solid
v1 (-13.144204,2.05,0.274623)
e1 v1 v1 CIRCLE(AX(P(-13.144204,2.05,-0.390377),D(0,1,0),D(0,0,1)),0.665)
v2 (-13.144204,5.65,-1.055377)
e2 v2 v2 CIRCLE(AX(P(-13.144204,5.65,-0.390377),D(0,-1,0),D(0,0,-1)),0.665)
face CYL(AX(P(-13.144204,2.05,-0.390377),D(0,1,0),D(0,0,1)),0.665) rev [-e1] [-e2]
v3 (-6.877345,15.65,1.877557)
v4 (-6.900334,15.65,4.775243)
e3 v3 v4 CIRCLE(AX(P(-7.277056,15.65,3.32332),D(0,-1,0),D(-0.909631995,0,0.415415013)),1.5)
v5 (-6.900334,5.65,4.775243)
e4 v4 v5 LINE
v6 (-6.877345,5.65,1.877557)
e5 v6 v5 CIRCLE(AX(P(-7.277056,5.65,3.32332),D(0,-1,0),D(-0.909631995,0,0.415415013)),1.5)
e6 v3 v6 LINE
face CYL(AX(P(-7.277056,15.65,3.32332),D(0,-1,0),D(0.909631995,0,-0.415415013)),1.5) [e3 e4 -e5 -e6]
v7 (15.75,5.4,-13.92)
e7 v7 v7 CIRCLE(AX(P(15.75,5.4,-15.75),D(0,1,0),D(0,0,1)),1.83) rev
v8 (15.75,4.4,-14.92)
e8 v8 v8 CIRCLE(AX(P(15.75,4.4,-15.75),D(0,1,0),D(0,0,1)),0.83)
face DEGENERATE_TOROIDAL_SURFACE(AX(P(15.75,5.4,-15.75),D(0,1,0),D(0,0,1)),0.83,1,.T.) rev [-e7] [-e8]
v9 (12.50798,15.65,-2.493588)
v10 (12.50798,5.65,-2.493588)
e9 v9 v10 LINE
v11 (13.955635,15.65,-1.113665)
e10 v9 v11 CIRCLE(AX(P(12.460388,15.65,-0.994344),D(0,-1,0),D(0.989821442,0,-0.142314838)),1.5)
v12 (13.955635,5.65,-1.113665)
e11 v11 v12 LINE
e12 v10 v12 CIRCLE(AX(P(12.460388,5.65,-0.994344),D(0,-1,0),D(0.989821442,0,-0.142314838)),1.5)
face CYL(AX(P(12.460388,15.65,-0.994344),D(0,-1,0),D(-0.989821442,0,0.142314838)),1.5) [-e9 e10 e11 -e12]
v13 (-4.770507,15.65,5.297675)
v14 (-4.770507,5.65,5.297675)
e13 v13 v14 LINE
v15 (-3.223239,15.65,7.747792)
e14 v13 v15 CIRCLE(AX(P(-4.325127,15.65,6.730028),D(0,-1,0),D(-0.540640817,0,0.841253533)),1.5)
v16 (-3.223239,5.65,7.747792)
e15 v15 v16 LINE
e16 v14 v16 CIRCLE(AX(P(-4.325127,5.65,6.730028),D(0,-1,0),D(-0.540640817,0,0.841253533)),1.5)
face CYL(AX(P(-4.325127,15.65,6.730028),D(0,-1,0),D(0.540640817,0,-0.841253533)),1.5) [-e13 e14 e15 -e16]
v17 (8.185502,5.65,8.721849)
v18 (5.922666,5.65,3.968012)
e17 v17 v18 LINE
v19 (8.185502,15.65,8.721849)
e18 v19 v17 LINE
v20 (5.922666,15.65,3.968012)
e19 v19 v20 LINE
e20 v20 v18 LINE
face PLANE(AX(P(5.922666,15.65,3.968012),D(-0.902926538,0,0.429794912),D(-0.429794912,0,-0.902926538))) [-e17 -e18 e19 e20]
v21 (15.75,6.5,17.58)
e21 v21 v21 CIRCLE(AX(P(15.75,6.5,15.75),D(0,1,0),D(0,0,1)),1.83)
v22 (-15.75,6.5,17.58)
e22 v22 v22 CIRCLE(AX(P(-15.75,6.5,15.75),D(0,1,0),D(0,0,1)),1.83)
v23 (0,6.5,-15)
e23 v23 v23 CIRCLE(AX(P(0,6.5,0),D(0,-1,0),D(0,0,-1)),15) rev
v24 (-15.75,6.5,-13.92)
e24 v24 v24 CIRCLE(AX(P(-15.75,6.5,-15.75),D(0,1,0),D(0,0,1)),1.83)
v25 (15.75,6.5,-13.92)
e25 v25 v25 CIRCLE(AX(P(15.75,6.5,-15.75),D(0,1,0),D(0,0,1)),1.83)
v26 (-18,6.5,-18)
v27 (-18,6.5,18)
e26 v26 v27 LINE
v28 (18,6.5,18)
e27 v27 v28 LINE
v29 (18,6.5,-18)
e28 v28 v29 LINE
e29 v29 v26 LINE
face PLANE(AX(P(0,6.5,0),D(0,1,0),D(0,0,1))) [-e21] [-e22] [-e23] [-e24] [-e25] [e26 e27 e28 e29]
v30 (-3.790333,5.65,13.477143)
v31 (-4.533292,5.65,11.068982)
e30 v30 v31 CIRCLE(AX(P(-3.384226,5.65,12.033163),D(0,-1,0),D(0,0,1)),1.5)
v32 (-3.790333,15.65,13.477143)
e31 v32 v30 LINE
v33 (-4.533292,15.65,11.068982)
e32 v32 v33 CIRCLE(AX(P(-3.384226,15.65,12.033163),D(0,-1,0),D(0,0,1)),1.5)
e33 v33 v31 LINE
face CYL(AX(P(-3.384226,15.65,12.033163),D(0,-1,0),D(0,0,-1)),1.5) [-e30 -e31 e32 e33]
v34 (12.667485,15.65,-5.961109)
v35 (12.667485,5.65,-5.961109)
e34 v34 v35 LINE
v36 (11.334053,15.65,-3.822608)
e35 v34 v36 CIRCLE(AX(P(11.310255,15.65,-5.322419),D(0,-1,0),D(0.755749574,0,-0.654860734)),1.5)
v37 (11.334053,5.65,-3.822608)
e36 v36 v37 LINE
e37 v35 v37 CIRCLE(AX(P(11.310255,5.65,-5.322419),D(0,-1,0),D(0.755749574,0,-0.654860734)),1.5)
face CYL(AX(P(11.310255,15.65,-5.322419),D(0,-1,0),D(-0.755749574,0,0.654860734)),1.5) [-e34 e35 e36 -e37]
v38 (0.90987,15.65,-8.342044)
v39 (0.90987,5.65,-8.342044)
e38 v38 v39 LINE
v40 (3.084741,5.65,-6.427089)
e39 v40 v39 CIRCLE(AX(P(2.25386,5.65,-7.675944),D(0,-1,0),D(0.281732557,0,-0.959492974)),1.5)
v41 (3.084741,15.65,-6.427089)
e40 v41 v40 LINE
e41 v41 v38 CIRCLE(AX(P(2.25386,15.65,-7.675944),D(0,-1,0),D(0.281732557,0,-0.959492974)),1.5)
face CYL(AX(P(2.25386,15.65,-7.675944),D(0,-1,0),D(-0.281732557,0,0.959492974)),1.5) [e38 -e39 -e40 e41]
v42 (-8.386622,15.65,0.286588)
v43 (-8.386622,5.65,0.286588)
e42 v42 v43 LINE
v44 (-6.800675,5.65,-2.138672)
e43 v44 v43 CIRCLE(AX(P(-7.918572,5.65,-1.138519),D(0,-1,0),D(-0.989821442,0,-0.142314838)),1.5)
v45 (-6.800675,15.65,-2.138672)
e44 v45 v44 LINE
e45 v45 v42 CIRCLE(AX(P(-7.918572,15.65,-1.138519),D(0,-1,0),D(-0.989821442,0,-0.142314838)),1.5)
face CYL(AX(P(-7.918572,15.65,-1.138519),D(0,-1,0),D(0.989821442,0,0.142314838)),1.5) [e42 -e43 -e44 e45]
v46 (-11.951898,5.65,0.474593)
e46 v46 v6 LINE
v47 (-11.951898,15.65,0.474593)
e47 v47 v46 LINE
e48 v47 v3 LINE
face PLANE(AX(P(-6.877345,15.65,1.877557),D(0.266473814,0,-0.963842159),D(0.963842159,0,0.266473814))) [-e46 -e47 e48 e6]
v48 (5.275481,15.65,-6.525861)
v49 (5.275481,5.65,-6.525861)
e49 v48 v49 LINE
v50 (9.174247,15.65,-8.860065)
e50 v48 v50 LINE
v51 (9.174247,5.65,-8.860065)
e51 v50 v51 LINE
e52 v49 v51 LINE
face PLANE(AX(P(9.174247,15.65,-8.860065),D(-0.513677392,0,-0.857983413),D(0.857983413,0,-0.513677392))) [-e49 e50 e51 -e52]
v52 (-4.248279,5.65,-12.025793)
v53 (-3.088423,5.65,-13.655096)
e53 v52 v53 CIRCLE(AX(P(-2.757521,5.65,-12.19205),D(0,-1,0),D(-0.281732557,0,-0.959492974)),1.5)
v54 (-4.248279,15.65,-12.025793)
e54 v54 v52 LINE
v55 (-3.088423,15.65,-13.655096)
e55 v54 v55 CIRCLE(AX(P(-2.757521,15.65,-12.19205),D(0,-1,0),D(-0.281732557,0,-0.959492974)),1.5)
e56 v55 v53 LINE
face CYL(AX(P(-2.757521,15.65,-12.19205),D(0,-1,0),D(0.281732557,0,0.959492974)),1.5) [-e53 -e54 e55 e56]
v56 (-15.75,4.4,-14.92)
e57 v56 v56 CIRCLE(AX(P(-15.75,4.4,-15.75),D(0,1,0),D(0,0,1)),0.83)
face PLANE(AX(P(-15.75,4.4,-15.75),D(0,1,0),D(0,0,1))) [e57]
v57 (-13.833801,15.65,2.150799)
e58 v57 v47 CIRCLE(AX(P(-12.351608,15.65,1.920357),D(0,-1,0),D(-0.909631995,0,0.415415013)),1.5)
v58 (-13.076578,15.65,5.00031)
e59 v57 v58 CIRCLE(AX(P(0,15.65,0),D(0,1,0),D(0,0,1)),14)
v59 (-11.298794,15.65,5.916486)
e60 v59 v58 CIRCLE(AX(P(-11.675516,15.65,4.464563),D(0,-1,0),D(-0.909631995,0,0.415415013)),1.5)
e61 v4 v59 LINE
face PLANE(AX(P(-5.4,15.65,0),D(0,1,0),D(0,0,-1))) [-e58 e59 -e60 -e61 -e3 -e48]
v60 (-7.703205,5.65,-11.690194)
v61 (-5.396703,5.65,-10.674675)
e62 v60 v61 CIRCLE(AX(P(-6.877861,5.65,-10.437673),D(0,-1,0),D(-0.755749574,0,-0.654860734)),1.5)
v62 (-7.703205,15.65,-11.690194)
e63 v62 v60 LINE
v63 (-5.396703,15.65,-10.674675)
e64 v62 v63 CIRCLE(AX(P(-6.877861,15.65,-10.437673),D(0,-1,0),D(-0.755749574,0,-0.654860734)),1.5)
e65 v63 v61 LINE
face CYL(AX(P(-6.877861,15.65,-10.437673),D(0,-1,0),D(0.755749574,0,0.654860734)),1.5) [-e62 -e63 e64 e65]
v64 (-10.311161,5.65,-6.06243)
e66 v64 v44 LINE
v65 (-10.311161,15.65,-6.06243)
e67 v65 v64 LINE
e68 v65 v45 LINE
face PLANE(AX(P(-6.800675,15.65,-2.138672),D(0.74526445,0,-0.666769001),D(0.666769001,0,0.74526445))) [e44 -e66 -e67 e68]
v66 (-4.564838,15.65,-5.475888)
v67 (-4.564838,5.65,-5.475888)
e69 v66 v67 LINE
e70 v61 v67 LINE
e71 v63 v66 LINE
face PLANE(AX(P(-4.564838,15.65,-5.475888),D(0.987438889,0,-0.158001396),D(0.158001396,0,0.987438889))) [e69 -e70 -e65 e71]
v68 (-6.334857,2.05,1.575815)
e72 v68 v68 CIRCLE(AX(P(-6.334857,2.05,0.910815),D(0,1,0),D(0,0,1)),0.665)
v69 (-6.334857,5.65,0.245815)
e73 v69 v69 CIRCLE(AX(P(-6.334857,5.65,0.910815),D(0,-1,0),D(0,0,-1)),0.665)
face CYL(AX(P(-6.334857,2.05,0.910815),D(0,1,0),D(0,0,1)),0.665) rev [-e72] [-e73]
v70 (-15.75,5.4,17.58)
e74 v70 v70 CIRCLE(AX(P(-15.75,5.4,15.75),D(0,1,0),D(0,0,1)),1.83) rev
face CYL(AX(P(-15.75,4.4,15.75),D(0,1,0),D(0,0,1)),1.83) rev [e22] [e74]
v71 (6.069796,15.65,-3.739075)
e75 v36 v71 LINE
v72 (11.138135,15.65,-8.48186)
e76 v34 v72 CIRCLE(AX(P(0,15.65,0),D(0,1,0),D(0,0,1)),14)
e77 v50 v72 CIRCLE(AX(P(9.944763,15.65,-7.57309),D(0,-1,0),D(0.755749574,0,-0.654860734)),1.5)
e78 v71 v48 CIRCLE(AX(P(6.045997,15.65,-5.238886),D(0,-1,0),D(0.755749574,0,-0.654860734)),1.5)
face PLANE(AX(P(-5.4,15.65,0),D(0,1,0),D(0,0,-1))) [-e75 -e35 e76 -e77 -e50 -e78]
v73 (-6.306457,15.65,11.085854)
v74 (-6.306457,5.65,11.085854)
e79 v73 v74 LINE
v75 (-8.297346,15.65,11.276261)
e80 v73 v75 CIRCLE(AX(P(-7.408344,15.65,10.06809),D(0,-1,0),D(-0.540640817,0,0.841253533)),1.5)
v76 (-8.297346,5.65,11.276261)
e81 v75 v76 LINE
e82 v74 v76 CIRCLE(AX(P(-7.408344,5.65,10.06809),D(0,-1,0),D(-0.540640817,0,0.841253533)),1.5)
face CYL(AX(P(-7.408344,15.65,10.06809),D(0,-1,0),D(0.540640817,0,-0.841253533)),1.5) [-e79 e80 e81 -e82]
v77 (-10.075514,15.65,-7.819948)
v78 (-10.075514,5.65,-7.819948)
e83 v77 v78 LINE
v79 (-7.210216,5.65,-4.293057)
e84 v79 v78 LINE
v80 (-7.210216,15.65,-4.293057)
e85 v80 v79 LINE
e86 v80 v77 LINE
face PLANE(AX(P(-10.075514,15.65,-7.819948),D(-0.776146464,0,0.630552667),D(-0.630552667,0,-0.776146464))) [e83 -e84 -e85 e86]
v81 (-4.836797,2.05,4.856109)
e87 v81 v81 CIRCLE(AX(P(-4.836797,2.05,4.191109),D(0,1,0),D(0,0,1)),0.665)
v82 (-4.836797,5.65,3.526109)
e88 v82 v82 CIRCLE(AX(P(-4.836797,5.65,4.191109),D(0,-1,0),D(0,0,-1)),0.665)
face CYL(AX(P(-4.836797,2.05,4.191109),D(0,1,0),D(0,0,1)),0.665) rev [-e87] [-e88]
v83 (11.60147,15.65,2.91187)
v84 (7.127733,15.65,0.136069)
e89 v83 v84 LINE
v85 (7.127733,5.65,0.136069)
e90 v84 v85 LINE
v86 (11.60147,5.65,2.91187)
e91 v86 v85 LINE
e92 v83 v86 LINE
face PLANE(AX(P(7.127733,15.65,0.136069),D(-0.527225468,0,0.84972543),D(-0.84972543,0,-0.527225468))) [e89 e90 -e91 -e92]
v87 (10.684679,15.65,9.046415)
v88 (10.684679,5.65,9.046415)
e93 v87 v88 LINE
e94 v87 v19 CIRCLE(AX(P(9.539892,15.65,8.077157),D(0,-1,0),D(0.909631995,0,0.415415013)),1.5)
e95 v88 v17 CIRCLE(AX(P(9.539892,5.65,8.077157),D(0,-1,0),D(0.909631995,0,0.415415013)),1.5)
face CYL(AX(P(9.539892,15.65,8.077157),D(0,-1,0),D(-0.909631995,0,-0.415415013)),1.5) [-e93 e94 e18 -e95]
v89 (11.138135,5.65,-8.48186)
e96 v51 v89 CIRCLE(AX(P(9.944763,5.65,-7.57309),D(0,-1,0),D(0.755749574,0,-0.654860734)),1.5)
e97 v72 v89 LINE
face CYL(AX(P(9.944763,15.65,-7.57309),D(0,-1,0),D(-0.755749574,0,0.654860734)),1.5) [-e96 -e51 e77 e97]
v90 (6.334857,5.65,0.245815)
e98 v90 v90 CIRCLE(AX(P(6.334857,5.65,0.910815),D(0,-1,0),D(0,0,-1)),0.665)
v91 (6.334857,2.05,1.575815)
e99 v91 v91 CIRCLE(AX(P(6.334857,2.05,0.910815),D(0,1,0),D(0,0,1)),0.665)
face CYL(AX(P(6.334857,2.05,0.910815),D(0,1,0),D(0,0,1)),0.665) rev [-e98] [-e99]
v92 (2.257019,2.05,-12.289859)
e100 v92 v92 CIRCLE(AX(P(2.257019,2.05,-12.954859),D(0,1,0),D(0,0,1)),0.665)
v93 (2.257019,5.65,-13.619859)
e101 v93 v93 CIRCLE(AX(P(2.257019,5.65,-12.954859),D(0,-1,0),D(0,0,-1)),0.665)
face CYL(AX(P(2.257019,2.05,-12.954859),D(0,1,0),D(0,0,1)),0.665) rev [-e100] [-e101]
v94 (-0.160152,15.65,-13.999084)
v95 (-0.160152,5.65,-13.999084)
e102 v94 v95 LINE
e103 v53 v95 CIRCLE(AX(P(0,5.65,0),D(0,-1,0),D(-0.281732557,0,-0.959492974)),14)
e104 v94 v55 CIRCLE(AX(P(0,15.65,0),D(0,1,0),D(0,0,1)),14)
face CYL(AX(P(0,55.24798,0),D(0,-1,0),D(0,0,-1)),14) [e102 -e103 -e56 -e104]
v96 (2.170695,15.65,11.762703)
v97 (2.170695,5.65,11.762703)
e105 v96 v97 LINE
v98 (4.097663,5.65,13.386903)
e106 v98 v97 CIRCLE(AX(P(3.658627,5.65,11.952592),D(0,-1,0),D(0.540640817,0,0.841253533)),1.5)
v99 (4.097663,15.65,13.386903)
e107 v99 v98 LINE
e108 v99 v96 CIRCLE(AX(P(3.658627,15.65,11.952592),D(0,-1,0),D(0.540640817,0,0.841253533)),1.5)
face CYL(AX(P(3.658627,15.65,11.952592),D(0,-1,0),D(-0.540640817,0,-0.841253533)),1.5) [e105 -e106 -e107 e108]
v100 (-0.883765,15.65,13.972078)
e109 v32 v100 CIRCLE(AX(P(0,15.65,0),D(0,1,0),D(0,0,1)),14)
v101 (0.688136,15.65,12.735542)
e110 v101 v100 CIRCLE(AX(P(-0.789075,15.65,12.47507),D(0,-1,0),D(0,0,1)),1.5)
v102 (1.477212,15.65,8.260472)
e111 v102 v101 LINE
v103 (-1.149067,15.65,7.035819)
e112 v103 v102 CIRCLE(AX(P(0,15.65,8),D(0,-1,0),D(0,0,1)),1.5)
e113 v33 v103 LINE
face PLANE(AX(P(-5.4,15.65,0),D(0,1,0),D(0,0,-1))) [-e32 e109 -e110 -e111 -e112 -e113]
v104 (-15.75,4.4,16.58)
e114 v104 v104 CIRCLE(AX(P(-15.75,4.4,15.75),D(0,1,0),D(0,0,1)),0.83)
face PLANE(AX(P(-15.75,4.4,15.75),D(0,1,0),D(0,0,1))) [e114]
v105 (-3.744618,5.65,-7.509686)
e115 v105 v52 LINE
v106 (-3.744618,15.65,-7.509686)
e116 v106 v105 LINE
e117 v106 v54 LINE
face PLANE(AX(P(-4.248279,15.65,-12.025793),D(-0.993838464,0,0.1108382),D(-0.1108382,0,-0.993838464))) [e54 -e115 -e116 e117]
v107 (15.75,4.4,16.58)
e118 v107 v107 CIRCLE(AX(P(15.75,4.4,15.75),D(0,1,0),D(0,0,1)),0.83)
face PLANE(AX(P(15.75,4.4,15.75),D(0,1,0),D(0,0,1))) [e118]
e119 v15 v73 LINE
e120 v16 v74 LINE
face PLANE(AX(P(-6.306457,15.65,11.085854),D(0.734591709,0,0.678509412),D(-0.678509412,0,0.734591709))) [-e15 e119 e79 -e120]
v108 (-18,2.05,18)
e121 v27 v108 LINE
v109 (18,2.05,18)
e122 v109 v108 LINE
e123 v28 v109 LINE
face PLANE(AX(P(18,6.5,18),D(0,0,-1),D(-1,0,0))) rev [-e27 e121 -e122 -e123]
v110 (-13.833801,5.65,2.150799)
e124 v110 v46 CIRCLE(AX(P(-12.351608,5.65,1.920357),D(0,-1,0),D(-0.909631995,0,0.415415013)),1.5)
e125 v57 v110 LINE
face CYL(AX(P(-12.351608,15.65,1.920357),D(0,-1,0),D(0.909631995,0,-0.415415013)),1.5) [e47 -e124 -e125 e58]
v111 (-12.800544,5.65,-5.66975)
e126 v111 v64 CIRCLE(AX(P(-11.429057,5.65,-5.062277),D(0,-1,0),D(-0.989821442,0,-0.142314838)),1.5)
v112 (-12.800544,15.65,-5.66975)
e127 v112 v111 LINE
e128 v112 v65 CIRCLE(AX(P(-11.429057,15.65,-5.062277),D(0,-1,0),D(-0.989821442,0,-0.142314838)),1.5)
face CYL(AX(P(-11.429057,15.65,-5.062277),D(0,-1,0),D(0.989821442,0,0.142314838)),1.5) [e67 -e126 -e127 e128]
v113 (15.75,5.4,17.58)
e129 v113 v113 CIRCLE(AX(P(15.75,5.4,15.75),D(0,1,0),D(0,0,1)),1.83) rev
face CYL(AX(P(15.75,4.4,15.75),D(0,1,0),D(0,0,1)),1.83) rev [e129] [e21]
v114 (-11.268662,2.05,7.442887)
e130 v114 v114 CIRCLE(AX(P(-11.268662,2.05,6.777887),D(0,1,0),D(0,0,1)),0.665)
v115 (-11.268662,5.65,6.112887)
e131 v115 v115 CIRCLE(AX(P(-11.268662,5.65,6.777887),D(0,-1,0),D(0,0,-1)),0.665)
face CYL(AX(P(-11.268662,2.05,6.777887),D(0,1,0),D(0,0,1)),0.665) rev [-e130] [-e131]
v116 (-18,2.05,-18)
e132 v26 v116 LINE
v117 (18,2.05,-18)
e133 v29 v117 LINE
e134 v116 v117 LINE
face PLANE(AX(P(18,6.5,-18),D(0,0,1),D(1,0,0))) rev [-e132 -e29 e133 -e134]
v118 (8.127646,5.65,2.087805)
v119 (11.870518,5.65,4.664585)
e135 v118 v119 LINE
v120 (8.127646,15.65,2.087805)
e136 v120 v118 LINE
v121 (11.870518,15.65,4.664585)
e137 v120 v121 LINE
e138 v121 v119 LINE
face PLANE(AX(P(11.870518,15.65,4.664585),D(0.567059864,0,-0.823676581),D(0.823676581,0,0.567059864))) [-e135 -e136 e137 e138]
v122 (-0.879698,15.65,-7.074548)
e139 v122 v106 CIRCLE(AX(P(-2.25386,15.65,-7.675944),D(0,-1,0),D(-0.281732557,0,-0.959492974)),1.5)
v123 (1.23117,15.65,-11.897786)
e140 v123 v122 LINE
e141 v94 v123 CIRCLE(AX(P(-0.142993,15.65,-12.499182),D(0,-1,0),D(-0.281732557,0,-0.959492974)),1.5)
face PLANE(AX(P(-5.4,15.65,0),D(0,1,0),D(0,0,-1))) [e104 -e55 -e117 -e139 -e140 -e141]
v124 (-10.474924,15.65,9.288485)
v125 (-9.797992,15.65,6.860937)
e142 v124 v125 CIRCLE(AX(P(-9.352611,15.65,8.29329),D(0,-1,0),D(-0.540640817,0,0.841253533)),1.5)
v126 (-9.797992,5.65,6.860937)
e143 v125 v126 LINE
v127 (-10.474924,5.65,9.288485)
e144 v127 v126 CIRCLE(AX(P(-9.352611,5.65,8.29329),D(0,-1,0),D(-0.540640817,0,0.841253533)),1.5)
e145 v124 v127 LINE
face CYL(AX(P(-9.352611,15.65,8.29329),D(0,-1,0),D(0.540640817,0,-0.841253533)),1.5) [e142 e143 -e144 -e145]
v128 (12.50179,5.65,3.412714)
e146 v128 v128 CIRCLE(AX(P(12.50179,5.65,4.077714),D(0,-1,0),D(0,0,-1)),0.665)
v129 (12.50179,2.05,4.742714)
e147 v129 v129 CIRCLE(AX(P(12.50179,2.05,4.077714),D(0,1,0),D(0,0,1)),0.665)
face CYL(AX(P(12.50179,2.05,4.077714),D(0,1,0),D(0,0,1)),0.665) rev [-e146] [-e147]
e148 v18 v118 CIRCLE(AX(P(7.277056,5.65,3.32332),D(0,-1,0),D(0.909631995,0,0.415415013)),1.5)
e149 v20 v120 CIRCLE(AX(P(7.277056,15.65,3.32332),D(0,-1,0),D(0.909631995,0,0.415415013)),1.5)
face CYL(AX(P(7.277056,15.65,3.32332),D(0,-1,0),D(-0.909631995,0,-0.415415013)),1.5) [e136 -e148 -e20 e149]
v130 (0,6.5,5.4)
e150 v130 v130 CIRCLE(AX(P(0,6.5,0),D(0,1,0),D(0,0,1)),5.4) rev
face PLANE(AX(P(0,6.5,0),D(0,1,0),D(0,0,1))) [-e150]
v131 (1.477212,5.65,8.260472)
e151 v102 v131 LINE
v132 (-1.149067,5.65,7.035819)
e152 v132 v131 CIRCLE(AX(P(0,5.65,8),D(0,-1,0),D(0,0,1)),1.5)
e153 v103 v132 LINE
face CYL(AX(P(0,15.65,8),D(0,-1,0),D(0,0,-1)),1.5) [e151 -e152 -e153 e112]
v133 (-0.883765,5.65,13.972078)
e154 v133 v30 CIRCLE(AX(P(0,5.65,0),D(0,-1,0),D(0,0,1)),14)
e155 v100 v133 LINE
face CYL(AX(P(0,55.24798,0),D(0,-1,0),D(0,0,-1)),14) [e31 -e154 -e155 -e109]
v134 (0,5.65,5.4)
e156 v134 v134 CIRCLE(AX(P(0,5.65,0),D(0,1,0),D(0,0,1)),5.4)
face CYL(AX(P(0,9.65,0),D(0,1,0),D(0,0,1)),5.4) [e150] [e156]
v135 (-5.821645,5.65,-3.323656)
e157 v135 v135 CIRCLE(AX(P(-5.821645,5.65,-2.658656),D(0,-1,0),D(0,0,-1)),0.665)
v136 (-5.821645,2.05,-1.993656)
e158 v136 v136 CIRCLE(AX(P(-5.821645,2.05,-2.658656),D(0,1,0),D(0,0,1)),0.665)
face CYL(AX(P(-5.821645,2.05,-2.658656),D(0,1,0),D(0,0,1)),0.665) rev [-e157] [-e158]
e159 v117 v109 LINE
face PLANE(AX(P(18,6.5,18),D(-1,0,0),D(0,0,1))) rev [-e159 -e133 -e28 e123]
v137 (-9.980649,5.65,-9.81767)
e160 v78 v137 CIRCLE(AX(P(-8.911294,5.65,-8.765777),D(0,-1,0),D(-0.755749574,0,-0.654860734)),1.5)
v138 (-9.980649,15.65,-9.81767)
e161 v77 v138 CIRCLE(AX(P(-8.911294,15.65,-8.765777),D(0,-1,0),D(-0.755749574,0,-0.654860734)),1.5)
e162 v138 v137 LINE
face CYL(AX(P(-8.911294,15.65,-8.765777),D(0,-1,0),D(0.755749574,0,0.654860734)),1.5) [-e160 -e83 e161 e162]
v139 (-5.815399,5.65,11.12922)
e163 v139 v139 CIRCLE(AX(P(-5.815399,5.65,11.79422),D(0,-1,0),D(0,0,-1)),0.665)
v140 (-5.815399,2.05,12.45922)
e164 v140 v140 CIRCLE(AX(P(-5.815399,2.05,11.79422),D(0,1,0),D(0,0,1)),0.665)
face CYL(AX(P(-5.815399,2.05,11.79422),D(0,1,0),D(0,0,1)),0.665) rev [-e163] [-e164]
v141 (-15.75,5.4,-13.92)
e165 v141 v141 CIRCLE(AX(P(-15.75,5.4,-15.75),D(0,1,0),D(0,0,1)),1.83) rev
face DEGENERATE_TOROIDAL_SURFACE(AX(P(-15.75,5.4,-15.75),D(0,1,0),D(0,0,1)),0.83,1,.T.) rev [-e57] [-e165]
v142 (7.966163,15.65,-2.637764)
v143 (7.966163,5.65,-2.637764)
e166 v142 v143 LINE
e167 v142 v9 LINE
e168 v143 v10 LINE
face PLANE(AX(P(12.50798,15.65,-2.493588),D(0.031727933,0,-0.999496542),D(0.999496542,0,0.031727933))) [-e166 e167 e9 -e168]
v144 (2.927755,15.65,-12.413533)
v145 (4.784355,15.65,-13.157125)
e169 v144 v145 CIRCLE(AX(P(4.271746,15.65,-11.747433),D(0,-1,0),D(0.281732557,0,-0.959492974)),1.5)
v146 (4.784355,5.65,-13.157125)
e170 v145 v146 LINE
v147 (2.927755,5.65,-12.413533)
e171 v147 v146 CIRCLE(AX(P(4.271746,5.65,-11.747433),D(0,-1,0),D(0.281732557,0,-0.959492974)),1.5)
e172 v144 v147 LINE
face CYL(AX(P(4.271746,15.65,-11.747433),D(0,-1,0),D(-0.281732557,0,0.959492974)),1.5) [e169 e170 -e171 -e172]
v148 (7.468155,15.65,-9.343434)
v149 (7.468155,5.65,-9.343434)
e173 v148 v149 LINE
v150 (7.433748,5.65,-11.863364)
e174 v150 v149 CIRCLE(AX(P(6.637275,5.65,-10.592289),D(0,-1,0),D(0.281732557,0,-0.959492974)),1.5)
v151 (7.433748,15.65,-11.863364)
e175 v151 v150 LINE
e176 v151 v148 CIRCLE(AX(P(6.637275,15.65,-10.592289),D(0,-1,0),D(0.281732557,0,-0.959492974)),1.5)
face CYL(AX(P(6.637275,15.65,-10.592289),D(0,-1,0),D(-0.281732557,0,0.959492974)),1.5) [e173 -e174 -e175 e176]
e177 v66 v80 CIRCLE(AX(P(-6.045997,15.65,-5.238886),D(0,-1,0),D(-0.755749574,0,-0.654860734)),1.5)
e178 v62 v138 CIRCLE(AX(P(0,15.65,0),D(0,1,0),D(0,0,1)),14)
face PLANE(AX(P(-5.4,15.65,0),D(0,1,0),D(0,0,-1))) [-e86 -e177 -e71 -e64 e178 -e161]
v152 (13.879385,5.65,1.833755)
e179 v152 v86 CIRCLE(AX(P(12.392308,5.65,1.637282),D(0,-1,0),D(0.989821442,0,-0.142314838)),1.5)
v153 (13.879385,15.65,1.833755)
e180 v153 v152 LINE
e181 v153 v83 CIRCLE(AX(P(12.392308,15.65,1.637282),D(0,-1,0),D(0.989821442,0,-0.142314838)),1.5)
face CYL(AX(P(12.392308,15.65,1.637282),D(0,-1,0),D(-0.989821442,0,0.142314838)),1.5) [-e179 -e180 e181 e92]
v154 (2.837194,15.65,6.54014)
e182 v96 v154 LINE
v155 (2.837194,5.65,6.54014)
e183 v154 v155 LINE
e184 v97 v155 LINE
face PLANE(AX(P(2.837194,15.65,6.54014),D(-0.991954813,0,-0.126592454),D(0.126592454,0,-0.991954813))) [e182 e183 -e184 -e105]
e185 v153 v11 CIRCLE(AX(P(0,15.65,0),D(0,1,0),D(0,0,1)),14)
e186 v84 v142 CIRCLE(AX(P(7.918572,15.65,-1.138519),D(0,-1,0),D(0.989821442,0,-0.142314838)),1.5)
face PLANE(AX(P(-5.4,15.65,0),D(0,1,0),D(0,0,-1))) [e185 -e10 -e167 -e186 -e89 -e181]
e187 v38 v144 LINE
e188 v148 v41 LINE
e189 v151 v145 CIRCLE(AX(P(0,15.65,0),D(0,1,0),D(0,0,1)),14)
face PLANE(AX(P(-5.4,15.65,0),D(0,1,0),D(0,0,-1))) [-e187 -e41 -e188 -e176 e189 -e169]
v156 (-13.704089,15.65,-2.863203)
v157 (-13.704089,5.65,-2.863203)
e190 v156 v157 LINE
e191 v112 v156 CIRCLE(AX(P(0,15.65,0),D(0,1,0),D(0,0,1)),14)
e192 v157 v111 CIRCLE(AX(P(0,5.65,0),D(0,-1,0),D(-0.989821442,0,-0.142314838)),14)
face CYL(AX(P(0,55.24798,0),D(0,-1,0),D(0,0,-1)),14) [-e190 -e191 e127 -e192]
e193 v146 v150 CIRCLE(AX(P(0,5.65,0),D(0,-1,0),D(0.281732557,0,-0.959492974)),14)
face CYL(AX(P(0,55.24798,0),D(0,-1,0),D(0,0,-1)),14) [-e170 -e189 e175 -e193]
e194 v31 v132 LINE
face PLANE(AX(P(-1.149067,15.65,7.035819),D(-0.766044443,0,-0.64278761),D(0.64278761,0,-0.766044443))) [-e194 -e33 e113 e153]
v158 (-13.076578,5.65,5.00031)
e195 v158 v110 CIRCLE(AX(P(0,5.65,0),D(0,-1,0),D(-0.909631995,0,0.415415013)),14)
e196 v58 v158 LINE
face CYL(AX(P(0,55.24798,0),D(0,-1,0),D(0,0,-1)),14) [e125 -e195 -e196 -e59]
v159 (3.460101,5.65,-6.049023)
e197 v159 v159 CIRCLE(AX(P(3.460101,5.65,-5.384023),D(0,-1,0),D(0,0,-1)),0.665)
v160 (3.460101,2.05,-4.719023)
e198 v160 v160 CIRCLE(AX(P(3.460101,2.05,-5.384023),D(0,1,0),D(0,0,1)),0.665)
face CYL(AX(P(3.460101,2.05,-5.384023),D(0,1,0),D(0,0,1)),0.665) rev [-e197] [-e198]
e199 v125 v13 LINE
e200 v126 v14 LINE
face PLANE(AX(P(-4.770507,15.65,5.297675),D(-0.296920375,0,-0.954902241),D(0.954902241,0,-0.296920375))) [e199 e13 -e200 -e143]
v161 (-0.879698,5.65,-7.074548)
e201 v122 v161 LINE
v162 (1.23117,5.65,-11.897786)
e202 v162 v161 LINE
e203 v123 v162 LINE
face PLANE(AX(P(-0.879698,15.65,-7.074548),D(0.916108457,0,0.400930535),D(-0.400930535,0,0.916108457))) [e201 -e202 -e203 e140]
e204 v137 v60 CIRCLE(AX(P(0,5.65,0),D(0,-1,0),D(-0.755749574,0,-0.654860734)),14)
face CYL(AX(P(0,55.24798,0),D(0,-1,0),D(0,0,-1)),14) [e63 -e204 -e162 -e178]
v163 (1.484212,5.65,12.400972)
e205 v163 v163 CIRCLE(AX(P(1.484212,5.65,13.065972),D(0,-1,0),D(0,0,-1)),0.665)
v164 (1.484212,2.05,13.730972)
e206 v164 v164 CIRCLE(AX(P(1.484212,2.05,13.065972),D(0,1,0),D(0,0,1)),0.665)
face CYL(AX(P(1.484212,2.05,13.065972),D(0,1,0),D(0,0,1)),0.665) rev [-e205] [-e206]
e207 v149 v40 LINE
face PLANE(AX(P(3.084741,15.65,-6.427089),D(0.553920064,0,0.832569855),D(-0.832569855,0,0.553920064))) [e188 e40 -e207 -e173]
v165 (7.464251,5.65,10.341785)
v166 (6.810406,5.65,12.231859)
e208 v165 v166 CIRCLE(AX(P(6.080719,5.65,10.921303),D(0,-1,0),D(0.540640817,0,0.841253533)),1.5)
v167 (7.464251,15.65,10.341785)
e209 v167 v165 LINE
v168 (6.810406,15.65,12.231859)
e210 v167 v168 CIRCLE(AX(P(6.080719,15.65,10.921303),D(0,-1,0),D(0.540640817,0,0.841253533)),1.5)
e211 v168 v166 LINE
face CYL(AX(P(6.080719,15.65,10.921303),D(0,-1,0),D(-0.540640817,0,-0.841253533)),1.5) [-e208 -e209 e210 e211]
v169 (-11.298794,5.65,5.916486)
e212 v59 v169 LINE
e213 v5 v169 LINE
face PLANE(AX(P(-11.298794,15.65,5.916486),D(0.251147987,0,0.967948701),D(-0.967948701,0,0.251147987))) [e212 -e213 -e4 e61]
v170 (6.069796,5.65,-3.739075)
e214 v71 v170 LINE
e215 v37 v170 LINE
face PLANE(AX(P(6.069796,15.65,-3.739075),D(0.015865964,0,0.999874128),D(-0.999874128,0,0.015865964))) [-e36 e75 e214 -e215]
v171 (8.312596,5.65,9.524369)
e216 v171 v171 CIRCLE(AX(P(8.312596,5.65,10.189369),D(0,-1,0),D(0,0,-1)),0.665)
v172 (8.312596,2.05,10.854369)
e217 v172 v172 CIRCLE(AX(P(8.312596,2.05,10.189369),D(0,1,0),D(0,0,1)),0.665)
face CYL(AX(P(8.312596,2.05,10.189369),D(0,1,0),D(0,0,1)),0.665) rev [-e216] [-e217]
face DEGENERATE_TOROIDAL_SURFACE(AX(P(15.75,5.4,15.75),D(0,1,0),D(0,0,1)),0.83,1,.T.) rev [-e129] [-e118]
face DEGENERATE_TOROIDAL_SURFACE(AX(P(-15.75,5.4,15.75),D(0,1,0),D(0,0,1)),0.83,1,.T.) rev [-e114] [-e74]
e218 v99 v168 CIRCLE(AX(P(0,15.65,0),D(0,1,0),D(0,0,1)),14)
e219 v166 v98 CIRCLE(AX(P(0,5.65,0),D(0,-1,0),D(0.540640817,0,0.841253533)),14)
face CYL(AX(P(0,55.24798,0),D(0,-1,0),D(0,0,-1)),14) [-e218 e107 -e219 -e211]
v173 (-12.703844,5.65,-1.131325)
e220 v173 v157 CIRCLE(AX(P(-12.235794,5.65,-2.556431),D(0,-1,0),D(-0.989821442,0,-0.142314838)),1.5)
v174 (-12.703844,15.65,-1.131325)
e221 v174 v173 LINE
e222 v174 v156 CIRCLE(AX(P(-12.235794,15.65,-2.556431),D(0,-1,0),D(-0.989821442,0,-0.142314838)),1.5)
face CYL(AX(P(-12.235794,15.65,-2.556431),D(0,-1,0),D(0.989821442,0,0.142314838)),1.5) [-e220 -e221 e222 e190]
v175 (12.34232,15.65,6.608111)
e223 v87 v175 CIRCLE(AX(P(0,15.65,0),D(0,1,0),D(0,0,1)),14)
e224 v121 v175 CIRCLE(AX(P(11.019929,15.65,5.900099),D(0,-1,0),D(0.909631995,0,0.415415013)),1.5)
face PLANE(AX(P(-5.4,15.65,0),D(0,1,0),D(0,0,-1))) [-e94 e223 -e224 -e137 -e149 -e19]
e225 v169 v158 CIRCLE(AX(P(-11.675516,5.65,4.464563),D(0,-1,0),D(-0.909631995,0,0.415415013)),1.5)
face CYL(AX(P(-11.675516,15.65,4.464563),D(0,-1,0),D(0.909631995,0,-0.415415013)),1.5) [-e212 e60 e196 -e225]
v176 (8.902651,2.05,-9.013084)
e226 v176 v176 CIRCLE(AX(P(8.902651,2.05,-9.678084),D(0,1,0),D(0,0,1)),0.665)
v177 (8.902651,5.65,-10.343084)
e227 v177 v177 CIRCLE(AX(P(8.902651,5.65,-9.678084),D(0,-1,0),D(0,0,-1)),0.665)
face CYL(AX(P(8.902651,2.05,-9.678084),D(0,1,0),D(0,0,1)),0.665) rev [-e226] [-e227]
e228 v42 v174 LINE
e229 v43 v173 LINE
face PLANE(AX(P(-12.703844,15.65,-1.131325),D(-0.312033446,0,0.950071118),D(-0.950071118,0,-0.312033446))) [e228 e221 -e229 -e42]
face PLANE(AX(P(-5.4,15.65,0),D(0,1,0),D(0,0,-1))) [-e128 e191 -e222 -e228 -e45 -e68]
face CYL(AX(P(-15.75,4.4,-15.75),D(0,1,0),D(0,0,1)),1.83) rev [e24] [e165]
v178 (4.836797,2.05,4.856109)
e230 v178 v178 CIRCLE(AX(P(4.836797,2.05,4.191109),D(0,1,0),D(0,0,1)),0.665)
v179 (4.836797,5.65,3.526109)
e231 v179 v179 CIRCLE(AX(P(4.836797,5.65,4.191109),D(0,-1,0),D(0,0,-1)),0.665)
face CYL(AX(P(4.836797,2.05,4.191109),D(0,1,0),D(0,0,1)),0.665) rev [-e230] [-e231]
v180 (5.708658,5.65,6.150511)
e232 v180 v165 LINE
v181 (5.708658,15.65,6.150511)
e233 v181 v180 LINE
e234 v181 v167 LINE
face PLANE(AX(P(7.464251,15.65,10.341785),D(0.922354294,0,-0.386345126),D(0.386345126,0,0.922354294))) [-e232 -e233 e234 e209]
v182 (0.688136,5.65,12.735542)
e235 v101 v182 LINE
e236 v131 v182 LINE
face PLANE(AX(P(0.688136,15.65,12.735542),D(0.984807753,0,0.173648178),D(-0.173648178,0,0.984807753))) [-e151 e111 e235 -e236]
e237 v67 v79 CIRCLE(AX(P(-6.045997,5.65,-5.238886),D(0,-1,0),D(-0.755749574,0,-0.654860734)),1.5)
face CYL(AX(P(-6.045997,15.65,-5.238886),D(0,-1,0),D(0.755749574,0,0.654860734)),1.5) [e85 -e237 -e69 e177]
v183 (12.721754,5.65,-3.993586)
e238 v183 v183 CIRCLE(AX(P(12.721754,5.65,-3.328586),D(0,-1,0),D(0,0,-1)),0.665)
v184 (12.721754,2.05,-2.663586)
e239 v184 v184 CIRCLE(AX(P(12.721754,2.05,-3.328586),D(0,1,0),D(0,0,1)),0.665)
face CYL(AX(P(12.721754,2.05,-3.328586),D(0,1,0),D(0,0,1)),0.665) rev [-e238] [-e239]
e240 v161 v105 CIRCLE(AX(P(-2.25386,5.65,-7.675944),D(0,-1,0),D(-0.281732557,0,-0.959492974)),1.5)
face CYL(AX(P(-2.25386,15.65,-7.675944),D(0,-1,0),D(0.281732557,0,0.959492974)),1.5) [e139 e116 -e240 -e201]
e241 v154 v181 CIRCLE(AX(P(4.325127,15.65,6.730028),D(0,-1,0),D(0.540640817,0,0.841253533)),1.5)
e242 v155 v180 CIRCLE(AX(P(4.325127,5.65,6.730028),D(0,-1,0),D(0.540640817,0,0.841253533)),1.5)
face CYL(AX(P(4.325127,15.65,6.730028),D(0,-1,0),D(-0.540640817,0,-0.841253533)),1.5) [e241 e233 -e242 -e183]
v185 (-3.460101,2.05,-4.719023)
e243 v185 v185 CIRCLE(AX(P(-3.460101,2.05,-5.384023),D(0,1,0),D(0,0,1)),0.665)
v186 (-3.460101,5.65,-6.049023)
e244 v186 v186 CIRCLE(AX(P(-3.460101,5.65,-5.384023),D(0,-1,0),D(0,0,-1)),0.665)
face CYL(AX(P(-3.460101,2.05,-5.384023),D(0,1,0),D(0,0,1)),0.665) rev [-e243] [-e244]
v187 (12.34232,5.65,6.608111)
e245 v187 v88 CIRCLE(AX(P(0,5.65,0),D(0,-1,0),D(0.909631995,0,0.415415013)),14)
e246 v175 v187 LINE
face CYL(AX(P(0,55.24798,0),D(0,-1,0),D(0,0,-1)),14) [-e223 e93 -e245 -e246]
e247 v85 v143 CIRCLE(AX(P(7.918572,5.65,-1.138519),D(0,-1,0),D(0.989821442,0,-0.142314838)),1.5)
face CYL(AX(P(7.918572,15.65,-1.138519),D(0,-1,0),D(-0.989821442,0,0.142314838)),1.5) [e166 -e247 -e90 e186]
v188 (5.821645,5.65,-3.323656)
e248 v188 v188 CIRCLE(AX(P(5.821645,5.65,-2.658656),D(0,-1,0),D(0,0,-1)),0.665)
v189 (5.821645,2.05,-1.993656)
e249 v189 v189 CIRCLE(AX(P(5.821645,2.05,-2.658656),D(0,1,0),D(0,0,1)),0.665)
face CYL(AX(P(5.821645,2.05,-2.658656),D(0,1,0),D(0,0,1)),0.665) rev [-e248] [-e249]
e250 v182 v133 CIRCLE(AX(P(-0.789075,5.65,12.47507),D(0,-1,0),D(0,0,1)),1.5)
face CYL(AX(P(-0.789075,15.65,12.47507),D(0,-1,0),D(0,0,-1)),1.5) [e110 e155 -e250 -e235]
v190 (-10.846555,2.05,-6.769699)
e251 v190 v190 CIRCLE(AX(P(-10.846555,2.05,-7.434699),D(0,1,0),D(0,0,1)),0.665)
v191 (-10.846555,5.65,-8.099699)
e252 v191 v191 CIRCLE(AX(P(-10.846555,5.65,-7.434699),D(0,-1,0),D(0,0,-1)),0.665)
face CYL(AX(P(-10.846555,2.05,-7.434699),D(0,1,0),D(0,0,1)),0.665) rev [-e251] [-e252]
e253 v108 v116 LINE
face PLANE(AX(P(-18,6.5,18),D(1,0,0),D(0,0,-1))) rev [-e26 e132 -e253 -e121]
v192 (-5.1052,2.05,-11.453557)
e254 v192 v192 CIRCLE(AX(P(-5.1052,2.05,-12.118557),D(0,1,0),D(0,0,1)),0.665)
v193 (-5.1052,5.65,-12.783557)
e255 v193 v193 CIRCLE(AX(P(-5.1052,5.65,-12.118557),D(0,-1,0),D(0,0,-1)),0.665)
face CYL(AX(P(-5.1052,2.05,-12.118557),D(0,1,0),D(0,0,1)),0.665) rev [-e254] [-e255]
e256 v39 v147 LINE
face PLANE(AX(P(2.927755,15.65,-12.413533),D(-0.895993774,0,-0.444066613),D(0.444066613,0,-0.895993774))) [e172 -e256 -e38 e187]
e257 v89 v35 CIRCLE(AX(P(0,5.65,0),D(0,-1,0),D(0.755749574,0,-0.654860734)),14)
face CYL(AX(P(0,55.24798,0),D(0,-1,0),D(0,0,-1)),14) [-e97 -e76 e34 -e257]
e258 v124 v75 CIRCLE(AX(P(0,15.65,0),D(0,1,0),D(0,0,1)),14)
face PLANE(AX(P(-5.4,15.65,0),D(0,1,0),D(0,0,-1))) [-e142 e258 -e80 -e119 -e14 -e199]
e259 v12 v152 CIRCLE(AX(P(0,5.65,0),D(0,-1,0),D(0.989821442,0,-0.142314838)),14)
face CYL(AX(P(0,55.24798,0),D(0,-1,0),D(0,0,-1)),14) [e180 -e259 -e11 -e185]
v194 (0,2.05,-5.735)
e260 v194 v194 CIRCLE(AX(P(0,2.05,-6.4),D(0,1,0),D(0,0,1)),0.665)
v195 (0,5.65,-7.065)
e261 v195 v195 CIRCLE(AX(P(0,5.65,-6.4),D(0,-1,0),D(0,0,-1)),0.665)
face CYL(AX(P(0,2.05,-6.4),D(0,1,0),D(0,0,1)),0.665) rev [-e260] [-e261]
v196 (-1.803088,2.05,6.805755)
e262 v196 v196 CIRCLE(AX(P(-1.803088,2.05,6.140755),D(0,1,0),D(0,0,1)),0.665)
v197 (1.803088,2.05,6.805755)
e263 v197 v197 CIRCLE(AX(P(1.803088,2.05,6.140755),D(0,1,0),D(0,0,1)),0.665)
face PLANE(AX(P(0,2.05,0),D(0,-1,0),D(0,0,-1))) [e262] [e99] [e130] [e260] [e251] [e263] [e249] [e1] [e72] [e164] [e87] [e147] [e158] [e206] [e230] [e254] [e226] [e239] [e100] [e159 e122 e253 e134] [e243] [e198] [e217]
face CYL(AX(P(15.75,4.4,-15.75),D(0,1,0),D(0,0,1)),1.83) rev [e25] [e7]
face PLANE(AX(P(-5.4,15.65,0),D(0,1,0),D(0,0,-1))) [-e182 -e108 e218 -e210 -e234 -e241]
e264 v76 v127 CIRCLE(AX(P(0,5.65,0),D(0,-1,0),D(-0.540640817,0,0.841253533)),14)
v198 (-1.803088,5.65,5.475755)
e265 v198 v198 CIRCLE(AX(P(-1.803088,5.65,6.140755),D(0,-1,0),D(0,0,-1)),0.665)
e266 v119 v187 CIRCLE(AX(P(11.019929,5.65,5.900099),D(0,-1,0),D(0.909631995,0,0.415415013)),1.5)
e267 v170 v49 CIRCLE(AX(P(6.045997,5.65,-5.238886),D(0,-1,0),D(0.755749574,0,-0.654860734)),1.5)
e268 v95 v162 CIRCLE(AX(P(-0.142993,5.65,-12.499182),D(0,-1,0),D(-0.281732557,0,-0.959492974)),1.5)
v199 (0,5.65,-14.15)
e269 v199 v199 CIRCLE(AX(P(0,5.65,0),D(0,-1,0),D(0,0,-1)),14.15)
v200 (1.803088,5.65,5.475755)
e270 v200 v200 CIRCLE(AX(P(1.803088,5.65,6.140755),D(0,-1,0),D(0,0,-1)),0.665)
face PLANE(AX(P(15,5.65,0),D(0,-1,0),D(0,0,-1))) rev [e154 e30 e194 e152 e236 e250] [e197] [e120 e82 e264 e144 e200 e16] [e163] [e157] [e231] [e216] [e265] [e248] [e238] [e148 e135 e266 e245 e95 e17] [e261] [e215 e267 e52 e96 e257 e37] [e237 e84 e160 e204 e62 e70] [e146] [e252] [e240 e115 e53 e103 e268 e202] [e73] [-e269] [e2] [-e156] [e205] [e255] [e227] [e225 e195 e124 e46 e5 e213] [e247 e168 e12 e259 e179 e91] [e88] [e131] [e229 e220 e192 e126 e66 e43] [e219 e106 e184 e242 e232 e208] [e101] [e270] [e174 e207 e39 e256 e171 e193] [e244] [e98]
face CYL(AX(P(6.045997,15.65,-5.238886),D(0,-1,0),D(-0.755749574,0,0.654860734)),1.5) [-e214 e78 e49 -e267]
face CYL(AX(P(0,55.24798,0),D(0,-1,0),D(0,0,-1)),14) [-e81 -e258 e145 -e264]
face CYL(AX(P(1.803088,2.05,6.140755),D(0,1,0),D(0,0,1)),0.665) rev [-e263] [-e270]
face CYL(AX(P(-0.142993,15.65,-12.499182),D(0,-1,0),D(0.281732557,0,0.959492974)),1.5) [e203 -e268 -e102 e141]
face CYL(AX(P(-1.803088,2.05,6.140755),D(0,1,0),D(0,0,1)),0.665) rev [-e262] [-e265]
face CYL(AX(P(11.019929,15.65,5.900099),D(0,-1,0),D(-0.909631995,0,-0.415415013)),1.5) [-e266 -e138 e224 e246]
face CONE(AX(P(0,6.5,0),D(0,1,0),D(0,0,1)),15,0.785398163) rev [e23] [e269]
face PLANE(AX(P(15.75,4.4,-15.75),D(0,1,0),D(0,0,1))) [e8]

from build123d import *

# Parameters (mm, degrees)
SKETCH1_W               = 36
SKETCH1_H               = 36
BOSS_EXTRUDE1_DEPTH     = 6.5
SKETCH2_R               = 14
SKETCH2_R_2             = 5.9
BOSS_EXTRUDE2_DEPTH     = 9.15
CAVITY1_START           = 5.65
CAVITY1_OUTLINE_R       = 5.4
CAVITY1_DEPTH           = 10
SKETCH5_W               = 36
SKETCH5_H               = 36
CUT_EXTRUDE1_DEPTH      = 8.55
SKETCH6_R               = 1.83
CUT_EXTRUDE2_DEPTH      = 2.1
FILLET1_R               = 1
CUT_EXTRUDE3_DEPTH      = 28.349588662
CUT_EXTRUDE3_DEPTH_BACK = 28.349588662
SKETCH7_R               = 0.665


with BuildPart() as part:
    # Sketch1 → Boss-Extrude1 (new, symmetric)
    with BuildSketch(Plane(origin=(0, 0, 0), x_dir=(1, 0, 0), z_dir=(0, 1, 0))):
        Rectangle(SKETCH1_W, SKETCH1_H)
    extrude(amount=BOSS_EXTRUDE1_DEPTH, both=True)

    # Sketch2 → Boss-Extrude2 (add)
    with BuildSketch(Plane(origin=(0, 6.5, 0), x_dir=(1, 0, 0), z_dir=(0, 1, 0))):
        with Locations(Location((0, 0, 0), (0, 0, 270))):
            Circle(SKETCH2_R)
        with Locations(Location((0, 0, 0), (0, 0, 270))):
            Circle(SKETCH2_R_2, mode=Mode.SUBTRACT)
    extrude(amount=BOSS_EXTRUDE2_DEPTH)

    # Cavity1: read off the stored shape, not the designer's step
    # Cavity1 outline → Cavity1 (cut)
    with BuildSketch(Plane(origin=(0, 0, 0), x_dir=(1, 0, 0), z_dir=(0, 1, 0)).offset(CAVITY1_START)):
        with BuildLine():
            Line((-4.533292403, -11.068981767), (-1.149066665, -7.035818585))
            ThreePointArc((-1.149066665, -7.035818585), (0.633927393, -6.640538319), (1.47721163, -8.260472267))
            Line((1.47721163, -8.260472267), (0.68813613, -12.7355418))
            ThreePointArc((0.68813613, -12.7355418), (0.138338934, -13.654010782), (-0.883764559, -13.972077877))
            ThreePointArc((-0.883764559, -13.972077877), (1.633368507, -13.904391656), (4.097662599, -13.3869026))
            ThreePointArc((4.097662599, -13.3869026), (2.691904846, -13.099521272), (2.170695102, -11.762702927))
            Line((2.170695102, -11.762702927), (2.83719432, -6.540139582))
            ThreePointArc((2.83719432, -6.540139582), (4.123439724, -5.243649297), (5.708657981, -6.150510574))
            Line((5.708657981, -6.150510574), (7.46425068, -10.341785051))
            ThreePointArc((7.46425068, -10.341785051), (7.498293668, -11.411693133), (6.810405547, -12.231859069))
            ThreePointArc((6.810405547, -12.231859069), (8.891358698, -10.814052918), (10.684679103, -9.046415448))
            ThreePointArc((10.684679103, -9.046415448), (9.346710352, -9.564664912), (8.185502249, -8.721849019))
            Line((8.185502249, -8.721849019), (5.922666155, -3.968012472))
            ThreePointArc((5.922666155, -3.968012472), (6.303789078, -2.181938673), (8.127645759, -2.087805232))
            Line((8.127645759, -2.087805232), (11.870518379, -4.664584621))
            ThreePointArc((11.870518379, -4.664584621), (12.477593142, -5.546243546), (12.342320013, -6.608111432))
            ThreePointArc((12.342320013, -6.608111432), (13.326405326, -4.290328786), (13.879385486, -1.833755311))
            ThreePointArc((13.879385486, -1.833755311), (13.03400136, -2.993095023), (11.601470268, -2.911869673))
            Line((11.601470268, -2.911869673), (7.127733334, -0.136069439))
            ThreePointArc((7.127733334, -0.136069439), (6.48272994, 1.572522062), (7.966163435, 2.63776352))
            Line((7.966163435, 2.63776352), (12.507980365, 2.493588468))
            ThreePointArc((12.507980365, 2.493588468), (13.495344957, 2.08009918), (13.955635081, 1.113664893))
            ThreePointArc((13.955635081, 1.113664893), (13.530412422, 3.59554442), (12.667485044, 5.961109181))
            ThreePointArc((12.667485044, 5.961109181), (12.583089031, 4.528761388), (11.334053449, 3.82260772))
            Line((11.334053449, 3.82260772), (6.069795541, 3.73907468))
            ThreePointArc((6.069795541, 3.73907468), (4.603449851, 4.827718154), (5.275480507, 6.525860991))
            Line((5.275480507, 6.525860991), (9.174246963, 8.860064838))
            ThreePointArc((9.174246963, 8.860064838), (10.228420101, 9.046025113), (11.138134616, 8.481860484))
            ThreePointArc((11.138134616, 8.481860484), (9.438609176, 10.339857679), (7.433747604, 11.863363627))
            ThreePointArc((7.433747604, 11.863363627), (8.137134842, 10.612768057), (7.468154743, 9.343434171))
            Line((7.468154743, 9.343434171), (3.084740551, 6.427089007))
            ThreePointArc((3.084740551, 6.427089007), (1.262606961, 6.550147844), (0.909869793, 8.342043708))
            Line((0.909869793, 8.342043708), (2.927754972, 12.413533223))
            ThreePointArc((2.927754972, 12.413533223), (3.714044133, 13.139901989), (4.78435511, 13.157125301))
            ThreePointArc((4.78435511, 13.157125301), (2.350114207, 13.801339182), (-0.160152175, 13.999083944))
            ThreePointArc((-0.160152175, 13.999083944), (1.107697836, 13.327295854), (1.231169673, 11.89778629))
            Line((1.231169673, 11.89778629), (-0.879697769, 7.074547986))
            ThreePointArc((-0.879697769, 7.074547986), (-2.479104719, 6.192951873), (-3.744618151, 7.509686489))
            Line((-3.744618151, 7.509686489), (-4.248278536, 12.02579252))
            ThreePointArc((-4.248278536, 12.02579252), (-3.979514604, 13.061952825), (-3.08842334, 13.655095799))
            ThreePointArc((-3.08842334, 13.655095799), (-5.484525418, 12.88099301), (-7.70320477, 11.690194022))
            ThreePointArc((-7.70320477, 11.690194022), (-6.273425408, 11.810501383), (-5.396703069, 10.674675328))
            Line((-5.396703069, 10.674675328), (-4.564838262, 5.475887966))
            ThreePointArc((-4.564838262, 5.475887966), (-5.433718166, 3.869537441), (-7.210216291, 4.293056871))
            Line((-7.210216291, 4.293056871), (-10.075513626, 7.819947663))
            ThreePointArc((-10.075513626, 7.819947663), (-10.409605573, 8.836925932), (-9.980649201, 9.817669863))
            ThreePointArc((-9.980649201, 9.817669863), (-11.577866975, 7.871022571), (-12.800544279, 5.669750096))
            ThreePointArc((-12.800544279, 5.669750096), (-11.66278041, 6.543956173), (-10.311160718, 6.062430373))
            Line((-10.311160718, 6.062430373), (-6.800674861, 2.138672207))
            ThreePointArc((-6.800674861, 2.138672207), (-6.663164489, 0.317572211), (-8.386621704, -0.28658797))
            Line((-8.386621704, -0.28658797), (-12.703844329, 1.131324675))
            ThreePointArc((-12.703844329, 1.131324675), (-13.534720323, 1.806237493), (-13.70408946, 2.863203114))
            ThreePointArc((-13.70408946, 2.863203114), (-13.995317572, 0.362058079), (-13.833801424, -2.150799424))
            ThreePointArc((-13.833801424, -2.150799424), (-13.349285037, -0.800248885), (-11.951897694, -0.474593391))
            Line((-11.951897694, -0.474593391), (-6.877345242, -1.877556866))
            ThreePointArc((-6.877345242, -1.877556866), (-5.777103166, -3.335219951), (-6.900333982, -4.775243156))
            Line((-6.900333982, -4.775243156), (-11.29879422, -5.916485904))
            ThreePointArc((-11.29879422, -5.916485904), (-12.362657002, -5.797918587), (-13.076578144, -5.000310394))
            ThreePointArc((-13.076578144, -5.000310394), (-11.969353727, -7.261857295), (-10.474924362, -9.288485324))
            ThreePointArc((-10.474924362, -9.288485324), (-10.797485986, -7.890380576), (-9.7979916, -6.860937106))
            Line((-9.7979916, -6.860937106), (-4.770507103, -5.2976749))
            ThreePointArc((-4.770507103, -5.2976749), (-3.056852407, -5.929103345), (-3.223238977, -7.74779238))
            Line((-3.223238977, -7.74779238), (-6.306456779, -11.085854011))
            ThreePointArc((-6.306456779, -11.085854011), (-7.265537434, -11.561276482), (-8.297345663, -11.276260681))
            ThreePointArc((-8.297345663, -11.276260681), (-6.143204645, -12.580184287), (-3.790332827, -13.477142763))
            ThreePointArc((-3.790332827, -13.477142763), (-4.817561427, -12.475372185), (-4.533292403, -11.068981767))
        make_face()
        Circle(CAVITY1_OUTLINE_R, mode=Mode.SUBTRACT)
    extrude(amount=CAVITY1_DEPTH, mode=Mode.SUBTRACT)

    # Cavity1 2 outline → Cavity1 2 (revolve, cut)
    with BuildSketch(Plane.XY):
        Polygon((14, 6.5), (14, 5.65), (14.15, 5.65), (15, 6.5), align=None)
    revolve(axis=Axis((0, 0, 0), (0, 1, 0)), mode=Mode.SUBTRACT)

    # Sketch5 → Cut-Extrude1 (cut)
    with BuildSketch(Plane.XZ.offset(6.5)):
        Rectangle(SKETCH5_W, SKETCH5_H)
    extrude(amount=-CUT_EXTRUDE1_DEPTH, mode=Mode.SUBTRACT)

    # Sketch6 → Cut-Extrude2 (cut)
    with BuildSketch(Plane(origin=(0, 6.5, 0), x_dir=(1, 0, 0), z_dir=(0, 1, 0))):
        with Locations(Location((-15.75, -15.75, 0), (0, 0, 270))):
            Circle(SKETCH6_R)
        with Locations(Location((15.75, -15.75, 0), (0, 0, 270))):
            Circle(SKETCH6_R)
        with Locations(Location((15.75, 15.75, 0), (0, 0, 270))):
            Circle(SKETCH6_R)
        with Locations(Location((-15.75, 15.75, 0), (0, 0, 270))):
            Circle(SKETCH6_R)
    extrude(amount=-CUT_EXTRUDE2_DEPTH, mode=Mode.SUBTRACT)

    # Fillet1
    fillet1_edges = [part.edges().sort_by_distance(p)[0] for p in [
        (15.75, 4.4, -17.58),
        (-15.75, 4.4, 13.92),
        (-15.75, 4.4, -17.58),
        (15.75, 4.4, 13.92),
    ]]
    fillet(fillet1_edges, radius=FILLET1_R)

    # Sketch7 → Cut-Extrude3 (cut, two sides: drawn at the far end of the back side and taken through both)
    with BuildSketch(Plane(origin=(0, 5.65, 0), x_dir=(1, 0, 0), z_dir=(0, 1, 0)).offset(-CUT_EXTRUDE3_DEPTH_BACK)):
        with Locations(Location((0, 6.4, 0), (0, 0, 270))):
            Circle(SKETCH7_R)
        with Locations(Location((2.257018876, 12.954858772, 0), (0, 0, 270))):
            Circle(SKETCH7_R)
        with Locations(Location((3.460101232, 5.38402261, 0), (0, 0, 270))):
            Circle(SKETCH7_R)
        with Locations(Location((8.90265054, 9.678084179, 0), (0, 0, 270))):
            Circle(SKETCH7_R)
        with Locations(Location((5.82164477, 2.658656083, 0), (0, 0, 270))):
            Circle(SKETCH7_R)
        with Locations(Location((12.72175356, 3.328586241, 0), (0, 0, 270))):
            Circle(SKETCH7_R)
        with Locations(Location((6.334857228, -0.910814965, 0), (0, 0, 270))):
            Circle(SKETCH7_R)
        with Locations(Location((12.501789712, -4.077714309, 0), (0, 0, 270))):
            Circle(SKETCH7_R)
        with Locations(Location((4.836797276, -4.191108697, 0), (0, 0, 270))):
            Circle(SKETCH7_R)
        with Locations(Location((8.312595965, -10.189369378, 0), (0, 0, 270))):
            Circle(SKETCH7_R)
        with Locations(Location((1.803088364, -6.140755031, 0), (0, 0, 270))):
            Circle(SKETCH7_R)
        with Locations(Location((1.484211732, -13.065971664, 0), (0, 0, 270))):
            Circle(SKETCH7_R)
        with Locations(Location((-1.803088364, -6.140755031, 0), (0, 0, 270))):
            Circle(SKETCH7_R)
        with Locations(Location((-5.815399238, -11.794220267, 0), (0, 0, 270))):
            Circle(SKETCH7_R)
        with Locations(Location((-4.836797276, -4.191108697, 0), (0, 0, 270))):
            Circle(SKETCH7_R)
        with Locations(Location((-11.26866204, -6.777887268, 0), (0, 0, 270))):
            Circle(SKETCH7_R)
        with Locations(Location((-6.334857228, -0.910814965, 0), (0, 0, 270))):
            Circle(SKETCH7_R)
        with Locations(Location((-13.144204265, 0.390377048, 0), (0, 0, 270))):
            Circle(SKETCH7_R)
        with Locations(Location((-5.82164477, 2.658656083, 0), (0, 0, 270))):
            Circle(SKETCH7_R)
        with Locations(Location((-10.846554508, 7.434699409, 0), (0, 0, 270))):
            Circle(SKETCH7_R)
        with Locations(Location((-3.460101232, 5.38402261, 0), (0, 0, 270))):
            Circle(SKETCH7_R)
        with Locations(Location((-5.105200333, 12.118557239, 0), (0, 0, 270))):
            Circle(SKETCH7_R)
    extrude(amount=CUT_EXTRUDE3_DEPTH + CUT_EXTRUDE3_DEPTH_BACK, mode=Mode.SUBTRACT)


solid = part.part
